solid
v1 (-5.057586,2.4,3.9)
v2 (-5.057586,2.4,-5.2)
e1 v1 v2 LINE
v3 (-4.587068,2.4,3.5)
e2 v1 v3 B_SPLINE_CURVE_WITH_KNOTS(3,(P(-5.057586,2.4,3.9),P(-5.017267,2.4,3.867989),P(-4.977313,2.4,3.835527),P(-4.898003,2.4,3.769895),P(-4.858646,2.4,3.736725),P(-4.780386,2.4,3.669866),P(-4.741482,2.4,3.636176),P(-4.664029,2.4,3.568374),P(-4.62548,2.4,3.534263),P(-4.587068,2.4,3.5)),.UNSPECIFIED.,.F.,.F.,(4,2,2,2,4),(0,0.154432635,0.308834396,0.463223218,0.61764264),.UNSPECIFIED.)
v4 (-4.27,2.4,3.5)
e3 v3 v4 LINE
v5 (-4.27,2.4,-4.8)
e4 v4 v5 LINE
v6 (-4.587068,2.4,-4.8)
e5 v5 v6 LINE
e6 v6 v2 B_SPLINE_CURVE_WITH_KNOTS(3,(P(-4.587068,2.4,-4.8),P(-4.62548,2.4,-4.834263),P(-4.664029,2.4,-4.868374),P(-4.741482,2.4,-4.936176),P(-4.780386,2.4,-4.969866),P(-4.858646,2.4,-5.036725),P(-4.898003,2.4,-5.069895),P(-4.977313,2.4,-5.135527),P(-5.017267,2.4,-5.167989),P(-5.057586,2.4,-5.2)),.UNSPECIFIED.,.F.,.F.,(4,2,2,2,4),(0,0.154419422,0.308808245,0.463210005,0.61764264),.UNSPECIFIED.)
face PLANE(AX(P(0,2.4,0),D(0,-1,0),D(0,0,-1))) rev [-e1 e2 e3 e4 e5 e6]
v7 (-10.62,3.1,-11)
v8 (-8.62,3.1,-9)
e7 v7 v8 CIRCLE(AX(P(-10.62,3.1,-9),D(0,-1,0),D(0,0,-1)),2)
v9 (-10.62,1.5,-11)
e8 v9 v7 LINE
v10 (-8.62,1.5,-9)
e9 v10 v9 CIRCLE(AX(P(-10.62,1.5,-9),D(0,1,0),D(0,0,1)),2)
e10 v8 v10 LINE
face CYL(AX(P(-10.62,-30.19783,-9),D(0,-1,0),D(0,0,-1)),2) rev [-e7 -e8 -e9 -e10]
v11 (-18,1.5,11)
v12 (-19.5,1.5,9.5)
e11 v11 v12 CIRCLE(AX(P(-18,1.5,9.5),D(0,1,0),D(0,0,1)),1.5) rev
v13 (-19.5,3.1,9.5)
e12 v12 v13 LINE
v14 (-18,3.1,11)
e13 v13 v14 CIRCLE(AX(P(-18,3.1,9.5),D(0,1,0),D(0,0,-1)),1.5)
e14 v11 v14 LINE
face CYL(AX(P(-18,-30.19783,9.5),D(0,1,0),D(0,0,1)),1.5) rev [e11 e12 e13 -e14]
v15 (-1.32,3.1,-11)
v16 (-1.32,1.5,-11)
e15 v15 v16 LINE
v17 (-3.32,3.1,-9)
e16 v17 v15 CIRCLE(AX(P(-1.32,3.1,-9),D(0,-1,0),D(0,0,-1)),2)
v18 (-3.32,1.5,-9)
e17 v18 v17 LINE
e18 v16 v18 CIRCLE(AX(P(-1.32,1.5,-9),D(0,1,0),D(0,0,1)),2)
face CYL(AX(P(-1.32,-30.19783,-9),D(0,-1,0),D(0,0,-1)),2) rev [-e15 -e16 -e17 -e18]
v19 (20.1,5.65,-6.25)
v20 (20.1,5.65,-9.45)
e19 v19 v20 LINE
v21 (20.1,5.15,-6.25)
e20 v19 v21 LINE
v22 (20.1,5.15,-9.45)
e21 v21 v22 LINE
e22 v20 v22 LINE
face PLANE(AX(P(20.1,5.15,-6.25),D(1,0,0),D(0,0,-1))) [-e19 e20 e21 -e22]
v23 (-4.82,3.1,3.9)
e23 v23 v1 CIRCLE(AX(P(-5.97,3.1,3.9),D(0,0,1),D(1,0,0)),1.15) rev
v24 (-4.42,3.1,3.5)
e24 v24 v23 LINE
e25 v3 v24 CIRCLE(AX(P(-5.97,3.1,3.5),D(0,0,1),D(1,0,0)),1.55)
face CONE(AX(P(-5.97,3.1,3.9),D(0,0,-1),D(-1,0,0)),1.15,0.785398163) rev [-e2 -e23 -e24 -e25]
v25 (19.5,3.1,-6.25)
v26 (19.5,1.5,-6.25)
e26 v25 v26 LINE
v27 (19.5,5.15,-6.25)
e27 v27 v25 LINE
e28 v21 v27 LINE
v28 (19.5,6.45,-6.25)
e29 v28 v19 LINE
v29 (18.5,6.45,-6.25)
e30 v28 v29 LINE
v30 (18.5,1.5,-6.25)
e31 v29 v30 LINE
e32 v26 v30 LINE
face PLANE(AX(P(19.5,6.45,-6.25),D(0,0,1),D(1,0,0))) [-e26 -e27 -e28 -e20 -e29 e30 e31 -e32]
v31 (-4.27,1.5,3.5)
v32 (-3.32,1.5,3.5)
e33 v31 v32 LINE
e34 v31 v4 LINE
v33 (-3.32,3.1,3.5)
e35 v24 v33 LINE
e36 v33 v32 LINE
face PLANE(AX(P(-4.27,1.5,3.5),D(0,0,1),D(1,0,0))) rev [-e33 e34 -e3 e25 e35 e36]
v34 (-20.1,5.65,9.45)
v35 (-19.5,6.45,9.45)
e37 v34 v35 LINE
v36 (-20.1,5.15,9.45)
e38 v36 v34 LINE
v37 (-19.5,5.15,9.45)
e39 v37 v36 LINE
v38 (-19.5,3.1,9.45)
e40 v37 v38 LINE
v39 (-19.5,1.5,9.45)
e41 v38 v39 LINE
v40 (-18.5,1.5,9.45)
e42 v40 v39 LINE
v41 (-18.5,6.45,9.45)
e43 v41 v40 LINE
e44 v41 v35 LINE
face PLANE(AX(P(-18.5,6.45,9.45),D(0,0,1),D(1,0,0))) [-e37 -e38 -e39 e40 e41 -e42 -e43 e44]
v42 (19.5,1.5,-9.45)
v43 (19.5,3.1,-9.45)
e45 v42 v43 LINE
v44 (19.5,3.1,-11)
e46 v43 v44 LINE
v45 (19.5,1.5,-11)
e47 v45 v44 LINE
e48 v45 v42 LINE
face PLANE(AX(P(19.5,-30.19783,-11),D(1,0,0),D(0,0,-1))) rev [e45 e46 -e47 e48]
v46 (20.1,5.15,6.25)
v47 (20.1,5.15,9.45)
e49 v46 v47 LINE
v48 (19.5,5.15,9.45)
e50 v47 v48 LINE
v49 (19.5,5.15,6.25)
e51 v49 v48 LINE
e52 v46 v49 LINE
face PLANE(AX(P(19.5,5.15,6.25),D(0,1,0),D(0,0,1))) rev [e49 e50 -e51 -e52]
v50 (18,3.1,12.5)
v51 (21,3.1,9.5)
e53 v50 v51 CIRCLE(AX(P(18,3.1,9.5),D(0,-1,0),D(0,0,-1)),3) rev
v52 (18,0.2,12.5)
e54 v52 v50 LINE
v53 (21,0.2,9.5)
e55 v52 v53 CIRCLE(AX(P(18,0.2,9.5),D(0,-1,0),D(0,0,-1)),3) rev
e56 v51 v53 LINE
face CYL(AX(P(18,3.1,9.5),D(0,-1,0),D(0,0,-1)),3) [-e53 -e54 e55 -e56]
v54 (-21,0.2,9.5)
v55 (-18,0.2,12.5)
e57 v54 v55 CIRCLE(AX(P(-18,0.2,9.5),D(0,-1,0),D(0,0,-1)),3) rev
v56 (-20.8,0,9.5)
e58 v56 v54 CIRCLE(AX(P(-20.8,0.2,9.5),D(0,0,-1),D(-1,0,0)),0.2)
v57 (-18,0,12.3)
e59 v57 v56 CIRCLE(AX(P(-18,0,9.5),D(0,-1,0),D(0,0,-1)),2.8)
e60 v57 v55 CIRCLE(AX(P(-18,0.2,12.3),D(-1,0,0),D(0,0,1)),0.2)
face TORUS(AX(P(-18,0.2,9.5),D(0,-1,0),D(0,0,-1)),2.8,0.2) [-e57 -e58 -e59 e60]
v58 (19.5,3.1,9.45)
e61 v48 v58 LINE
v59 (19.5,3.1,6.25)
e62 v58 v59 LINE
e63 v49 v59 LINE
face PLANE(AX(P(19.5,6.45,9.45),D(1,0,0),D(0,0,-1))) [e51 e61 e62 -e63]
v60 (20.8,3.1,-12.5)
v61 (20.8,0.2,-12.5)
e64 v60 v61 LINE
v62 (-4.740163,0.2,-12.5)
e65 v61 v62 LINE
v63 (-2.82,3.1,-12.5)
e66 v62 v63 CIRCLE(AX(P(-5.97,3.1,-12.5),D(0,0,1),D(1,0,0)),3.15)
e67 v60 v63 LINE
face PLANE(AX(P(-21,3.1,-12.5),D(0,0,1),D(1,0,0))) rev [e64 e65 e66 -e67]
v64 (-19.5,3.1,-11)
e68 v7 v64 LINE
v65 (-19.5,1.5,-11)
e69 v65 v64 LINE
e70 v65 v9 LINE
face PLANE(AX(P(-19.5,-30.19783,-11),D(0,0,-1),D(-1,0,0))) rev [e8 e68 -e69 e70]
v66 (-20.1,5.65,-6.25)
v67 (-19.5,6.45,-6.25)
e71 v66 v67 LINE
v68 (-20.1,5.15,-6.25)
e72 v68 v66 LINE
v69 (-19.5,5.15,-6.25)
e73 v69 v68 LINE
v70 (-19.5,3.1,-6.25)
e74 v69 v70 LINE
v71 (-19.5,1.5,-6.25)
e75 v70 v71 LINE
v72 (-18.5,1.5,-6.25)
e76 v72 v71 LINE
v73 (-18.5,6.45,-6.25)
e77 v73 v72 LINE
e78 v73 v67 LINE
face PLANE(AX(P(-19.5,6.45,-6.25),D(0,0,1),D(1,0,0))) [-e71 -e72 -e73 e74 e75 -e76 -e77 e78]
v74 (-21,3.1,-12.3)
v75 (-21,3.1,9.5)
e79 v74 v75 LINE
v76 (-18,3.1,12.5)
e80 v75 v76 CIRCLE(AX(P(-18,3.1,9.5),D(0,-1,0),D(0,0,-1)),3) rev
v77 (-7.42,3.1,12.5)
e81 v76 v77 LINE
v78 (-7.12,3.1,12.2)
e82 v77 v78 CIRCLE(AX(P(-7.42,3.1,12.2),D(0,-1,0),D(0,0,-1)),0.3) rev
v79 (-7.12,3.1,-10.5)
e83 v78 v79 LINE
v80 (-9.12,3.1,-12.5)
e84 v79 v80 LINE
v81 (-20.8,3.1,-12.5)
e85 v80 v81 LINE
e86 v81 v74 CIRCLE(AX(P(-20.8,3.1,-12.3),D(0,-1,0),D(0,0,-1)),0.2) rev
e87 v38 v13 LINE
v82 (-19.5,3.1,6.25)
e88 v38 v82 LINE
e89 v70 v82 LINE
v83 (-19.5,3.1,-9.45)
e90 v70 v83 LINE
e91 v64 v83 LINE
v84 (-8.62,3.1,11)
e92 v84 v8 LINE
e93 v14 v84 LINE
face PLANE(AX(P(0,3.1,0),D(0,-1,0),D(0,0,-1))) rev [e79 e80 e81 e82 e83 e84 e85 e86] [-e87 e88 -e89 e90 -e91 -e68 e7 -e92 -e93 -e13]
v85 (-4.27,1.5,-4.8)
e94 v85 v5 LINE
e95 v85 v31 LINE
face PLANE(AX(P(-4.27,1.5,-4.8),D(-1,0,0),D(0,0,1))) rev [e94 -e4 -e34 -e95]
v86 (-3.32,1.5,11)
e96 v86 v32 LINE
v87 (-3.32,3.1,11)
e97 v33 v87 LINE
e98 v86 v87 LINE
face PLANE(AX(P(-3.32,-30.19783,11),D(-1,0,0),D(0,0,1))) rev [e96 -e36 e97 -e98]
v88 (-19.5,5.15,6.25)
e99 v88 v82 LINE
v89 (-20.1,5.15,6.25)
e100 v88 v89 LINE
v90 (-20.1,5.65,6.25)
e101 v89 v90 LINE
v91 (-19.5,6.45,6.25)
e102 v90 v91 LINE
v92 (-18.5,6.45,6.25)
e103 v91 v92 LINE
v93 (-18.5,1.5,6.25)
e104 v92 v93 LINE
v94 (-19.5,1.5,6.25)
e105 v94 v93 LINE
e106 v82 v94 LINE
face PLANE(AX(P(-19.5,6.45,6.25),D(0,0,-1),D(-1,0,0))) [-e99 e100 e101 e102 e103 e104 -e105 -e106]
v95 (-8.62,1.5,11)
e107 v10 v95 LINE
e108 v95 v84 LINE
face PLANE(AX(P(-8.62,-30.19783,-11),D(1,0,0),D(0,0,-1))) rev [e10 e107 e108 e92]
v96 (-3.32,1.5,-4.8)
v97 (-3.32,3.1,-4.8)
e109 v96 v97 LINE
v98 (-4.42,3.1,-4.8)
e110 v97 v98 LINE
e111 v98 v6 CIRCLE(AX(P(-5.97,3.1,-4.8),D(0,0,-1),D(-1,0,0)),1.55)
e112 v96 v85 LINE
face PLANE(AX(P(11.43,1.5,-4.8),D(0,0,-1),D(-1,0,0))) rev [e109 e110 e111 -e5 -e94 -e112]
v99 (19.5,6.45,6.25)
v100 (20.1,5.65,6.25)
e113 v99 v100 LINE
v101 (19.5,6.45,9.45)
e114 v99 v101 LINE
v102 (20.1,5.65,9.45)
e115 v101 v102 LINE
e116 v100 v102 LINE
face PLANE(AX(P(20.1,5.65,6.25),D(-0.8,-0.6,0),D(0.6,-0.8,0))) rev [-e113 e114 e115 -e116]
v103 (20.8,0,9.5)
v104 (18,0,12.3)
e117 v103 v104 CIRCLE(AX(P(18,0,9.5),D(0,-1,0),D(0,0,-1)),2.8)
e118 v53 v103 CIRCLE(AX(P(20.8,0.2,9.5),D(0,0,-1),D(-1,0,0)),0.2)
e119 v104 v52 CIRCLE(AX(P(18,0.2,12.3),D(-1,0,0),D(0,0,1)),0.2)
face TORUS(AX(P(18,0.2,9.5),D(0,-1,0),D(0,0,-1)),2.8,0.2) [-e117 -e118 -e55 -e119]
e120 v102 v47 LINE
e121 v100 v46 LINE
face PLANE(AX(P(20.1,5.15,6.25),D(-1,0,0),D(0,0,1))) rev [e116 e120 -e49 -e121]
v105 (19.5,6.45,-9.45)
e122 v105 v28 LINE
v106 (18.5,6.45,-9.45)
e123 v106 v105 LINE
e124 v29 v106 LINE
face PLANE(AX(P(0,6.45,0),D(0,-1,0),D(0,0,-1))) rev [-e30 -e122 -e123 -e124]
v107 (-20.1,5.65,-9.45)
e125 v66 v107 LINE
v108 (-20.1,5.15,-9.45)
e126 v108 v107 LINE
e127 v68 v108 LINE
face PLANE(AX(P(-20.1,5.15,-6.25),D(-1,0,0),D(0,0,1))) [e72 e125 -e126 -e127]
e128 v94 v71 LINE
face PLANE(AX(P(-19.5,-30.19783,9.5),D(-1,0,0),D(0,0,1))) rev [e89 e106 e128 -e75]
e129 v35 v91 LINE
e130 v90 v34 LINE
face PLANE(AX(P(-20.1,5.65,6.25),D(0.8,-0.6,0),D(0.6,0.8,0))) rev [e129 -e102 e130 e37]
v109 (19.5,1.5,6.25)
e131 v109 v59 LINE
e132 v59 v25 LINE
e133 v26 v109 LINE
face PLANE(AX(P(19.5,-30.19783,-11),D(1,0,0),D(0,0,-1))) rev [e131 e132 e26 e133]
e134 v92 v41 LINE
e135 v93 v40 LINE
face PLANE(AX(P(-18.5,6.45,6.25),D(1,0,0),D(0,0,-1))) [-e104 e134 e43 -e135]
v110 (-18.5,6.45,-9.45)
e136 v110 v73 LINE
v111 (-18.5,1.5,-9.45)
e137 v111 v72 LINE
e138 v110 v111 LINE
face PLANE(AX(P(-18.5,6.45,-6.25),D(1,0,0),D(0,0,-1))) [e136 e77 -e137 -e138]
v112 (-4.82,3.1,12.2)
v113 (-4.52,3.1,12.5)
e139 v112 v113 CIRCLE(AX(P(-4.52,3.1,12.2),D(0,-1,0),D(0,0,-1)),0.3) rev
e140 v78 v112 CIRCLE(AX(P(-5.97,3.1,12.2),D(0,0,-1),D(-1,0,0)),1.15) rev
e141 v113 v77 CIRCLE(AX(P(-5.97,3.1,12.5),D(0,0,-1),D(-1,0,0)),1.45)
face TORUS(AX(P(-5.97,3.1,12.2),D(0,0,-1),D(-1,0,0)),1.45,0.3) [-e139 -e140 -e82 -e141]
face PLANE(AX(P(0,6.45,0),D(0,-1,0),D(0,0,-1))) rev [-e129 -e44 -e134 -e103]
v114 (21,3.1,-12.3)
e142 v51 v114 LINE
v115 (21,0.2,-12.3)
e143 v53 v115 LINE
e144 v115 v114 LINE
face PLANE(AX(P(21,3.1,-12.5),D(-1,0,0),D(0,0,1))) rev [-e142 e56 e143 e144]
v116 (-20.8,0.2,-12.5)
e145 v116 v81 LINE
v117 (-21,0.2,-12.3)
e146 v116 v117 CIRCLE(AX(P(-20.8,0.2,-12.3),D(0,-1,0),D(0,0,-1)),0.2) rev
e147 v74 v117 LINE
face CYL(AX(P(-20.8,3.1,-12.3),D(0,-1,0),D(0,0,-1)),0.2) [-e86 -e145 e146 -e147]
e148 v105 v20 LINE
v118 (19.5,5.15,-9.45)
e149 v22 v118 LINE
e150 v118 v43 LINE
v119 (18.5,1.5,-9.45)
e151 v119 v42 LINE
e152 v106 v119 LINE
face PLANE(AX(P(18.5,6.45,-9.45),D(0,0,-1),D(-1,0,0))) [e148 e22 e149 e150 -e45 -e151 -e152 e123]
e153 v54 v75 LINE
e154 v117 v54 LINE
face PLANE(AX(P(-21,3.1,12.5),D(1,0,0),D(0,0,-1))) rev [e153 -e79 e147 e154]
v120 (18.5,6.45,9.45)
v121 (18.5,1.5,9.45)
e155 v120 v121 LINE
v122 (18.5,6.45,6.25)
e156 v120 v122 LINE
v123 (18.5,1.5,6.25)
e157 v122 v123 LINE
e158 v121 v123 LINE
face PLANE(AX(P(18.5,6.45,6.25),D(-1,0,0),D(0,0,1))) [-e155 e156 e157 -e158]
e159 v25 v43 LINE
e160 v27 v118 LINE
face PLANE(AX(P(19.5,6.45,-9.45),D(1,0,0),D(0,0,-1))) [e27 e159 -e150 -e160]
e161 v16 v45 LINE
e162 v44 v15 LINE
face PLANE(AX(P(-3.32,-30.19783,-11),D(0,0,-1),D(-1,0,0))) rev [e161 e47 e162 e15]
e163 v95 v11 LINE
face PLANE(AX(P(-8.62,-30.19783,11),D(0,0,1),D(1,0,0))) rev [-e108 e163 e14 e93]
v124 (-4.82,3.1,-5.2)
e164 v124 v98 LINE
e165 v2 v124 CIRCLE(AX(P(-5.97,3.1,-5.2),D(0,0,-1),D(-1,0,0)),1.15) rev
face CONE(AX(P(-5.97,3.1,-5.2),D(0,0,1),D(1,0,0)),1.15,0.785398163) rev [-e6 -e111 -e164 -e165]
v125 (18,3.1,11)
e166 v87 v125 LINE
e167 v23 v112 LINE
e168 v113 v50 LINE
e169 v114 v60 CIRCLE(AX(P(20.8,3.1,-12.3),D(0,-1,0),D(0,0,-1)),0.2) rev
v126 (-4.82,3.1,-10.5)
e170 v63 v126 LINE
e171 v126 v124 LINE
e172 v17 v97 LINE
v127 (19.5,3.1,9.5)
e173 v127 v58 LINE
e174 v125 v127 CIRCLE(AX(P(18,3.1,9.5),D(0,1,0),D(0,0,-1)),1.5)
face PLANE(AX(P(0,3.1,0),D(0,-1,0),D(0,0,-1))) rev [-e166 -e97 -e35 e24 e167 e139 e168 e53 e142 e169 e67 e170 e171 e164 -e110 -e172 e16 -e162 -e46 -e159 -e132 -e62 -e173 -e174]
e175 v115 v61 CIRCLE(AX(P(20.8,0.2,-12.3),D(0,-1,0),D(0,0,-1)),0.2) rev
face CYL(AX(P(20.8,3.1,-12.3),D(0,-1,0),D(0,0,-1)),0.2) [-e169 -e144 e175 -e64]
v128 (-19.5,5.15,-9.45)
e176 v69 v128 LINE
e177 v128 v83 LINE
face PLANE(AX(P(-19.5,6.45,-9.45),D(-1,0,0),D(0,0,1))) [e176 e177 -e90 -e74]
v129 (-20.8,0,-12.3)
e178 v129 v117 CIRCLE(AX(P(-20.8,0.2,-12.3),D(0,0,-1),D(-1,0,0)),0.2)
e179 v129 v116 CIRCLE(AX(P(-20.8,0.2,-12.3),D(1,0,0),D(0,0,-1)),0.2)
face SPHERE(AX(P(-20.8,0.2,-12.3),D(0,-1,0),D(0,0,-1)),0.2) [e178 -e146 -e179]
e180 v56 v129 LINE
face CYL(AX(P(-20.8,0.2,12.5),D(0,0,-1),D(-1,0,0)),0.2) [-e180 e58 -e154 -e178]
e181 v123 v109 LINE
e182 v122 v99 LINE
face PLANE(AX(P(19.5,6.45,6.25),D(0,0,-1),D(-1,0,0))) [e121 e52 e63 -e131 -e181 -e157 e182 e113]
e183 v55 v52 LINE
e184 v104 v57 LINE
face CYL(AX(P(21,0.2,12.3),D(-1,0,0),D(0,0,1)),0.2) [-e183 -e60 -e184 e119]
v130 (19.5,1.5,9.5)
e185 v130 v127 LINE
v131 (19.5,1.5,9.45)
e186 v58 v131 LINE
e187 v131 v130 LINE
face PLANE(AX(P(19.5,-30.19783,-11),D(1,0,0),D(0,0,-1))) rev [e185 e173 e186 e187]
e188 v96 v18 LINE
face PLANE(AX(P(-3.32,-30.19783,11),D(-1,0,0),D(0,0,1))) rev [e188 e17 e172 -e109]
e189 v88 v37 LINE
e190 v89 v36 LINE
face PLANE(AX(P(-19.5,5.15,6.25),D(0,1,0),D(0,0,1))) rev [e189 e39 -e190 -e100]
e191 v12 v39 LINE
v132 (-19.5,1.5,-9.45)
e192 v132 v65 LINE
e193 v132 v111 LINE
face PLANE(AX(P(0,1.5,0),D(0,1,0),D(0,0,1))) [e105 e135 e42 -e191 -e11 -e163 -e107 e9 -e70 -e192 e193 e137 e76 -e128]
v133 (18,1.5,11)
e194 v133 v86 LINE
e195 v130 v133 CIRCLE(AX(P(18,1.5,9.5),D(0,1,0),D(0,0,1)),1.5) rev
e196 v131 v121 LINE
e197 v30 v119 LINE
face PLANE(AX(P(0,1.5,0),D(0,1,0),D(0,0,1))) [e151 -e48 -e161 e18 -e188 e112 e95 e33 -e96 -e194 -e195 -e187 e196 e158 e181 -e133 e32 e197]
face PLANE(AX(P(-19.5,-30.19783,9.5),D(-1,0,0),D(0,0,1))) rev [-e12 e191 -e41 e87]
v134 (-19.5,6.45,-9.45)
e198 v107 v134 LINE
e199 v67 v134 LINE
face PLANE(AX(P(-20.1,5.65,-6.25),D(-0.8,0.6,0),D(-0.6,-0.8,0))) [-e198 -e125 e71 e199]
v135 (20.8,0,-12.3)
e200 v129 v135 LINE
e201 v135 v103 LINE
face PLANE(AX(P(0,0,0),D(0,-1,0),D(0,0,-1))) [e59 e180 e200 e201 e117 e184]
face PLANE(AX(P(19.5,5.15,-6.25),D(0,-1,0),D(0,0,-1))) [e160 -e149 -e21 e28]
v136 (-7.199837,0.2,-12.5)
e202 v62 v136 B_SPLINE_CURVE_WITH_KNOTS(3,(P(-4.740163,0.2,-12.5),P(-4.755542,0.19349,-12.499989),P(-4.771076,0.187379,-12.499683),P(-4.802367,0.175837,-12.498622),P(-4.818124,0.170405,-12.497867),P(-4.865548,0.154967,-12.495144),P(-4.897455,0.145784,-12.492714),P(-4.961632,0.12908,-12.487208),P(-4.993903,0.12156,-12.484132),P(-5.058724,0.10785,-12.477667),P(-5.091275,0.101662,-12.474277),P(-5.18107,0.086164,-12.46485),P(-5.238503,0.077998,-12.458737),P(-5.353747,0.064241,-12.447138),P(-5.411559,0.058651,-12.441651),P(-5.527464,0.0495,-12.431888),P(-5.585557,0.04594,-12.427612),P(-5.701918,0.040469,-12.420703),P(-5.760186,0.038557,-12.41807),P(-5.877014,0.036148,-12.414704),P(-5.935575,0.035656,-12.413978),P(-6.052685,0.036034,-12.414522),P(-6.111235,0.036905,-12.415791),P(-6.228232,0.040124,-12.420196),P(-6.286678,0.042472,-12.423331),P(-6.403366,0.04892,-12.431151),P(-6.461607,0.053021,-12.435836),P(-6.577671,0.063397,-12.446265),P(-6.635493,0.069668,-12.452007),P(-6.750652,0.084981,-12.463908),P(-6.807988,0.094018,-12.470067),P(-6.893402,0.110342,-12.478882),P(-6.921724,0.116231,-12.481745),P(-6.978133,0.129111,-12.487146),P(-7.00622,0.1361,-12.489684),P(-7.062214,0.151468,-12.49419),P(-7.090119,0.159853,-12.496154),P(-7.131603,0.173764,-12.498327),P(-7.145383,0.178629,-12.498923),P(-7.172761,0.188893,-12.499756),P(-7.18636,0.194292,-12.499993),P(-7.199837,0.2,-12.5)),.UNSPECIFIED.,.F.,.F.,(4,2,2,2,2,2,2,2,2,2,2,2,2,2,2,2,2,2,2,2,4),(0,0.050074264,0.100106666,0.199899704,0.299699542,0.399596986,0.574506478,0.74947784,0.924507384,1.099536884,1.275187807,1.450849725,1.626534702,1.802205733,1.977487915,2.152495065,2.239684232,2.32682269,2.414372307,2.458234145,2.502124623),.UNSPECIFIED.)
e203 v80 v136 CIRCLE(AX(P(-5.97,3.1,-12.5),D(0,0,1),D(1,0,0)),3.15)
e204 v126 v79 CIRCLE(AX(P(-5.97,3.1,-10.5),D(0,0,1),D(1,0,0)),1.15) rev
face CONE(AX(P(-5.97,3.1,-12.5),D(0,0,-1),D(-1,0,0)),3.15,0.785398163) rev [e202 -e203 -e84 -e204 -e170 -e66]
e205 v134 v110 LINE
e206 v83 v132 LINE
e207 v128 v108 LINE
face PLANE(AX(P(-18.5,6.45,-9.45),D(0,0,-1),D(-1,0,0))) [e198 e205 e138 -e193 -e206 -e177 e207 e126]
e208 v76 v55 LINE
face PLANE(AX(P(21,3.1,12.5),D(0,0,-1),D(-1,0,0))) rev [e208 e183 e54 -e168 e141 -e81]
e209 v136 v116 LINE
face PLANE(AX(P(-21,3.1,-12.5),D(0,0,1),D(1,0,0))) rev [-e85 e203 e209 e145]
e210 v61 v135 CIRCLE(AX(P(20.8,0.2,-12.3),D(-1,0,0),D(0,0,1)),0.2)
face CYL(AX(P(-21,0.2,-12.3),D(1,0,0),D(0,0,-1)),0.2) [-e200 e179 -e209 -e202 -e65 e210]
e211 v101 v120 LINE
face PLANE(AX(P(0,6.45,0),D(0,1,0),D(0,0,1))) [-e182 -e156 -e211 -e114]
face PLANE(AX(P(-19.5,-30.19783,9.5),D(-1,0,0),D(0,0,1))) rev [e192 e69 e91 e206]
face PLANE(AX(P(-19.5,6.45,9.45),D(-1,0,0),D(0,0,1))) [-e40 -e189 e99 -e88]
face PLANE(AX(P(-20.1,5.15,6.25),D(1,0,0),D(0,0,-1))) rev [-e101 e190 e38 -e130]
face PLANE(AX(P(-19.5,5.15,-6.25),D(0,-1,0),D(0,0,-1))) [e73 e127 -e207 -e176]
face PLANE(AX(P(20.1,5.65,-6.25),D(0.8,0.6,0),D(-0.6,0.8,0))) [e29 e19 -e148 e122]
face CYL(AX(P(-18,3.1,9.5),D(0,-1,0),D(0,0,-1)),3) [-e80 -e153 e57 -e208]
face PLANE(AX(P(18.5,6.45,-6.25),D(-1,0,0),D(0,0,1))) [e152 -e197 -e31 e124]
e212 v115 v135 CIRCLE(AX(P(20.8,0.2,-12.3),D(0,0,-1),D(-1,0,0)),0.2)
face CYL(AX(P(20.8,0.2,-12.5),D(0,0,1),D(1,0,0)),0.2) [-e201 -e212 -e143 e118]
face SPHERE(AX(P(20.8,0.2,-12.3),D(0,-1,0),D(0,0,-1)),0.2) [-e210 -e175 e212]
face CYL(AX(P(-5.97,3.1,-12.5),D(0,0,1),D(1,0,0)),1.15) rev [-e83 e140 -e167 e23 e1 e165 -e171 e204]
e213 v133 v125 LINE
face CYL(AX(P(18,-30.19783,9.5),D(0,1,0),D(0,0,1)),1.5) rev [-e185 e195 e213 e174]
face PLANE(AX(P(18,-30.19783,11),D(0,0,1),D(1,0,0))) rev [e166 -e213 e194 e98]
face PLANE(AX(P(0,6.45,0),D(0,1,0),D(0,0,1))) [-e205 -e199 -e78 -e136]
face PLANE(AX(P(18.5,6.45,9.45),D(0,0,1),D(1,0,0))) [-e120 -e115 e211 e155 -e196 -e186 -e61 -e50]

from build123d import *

# Parameters (mm, degrees)
SKETCH_1_W          = 42
SKETCH_1_H          = 25
EXTRUDE_1_DEPTH     = 3.1
SKETCH_3_R          = 1.15
CUT_EXTRUDE_1_DEPTH = 33.796493715
SKETCH_5_W          = 15.7
SKETCH_5_H          = 8.3
CUT_EXTRUDE_3_DEPTH = 1.6
FILLET_4_R          = 3
SKETCH_10_W         = 1.324084548
SKETCH_10_H         = 8.3
CUT_EXTRUDE_4_DEPTH = 0.7
CUT_EXTRUDE_5_DEPTH = 1.6
FILLET_5_R          = 0.3
CHAMFER_1_SIZE      = 0.4
CHAMFER_2_SIZE      = 2
FILLET_6_R          = 2
SKETCH_13_W         = 1
SKETCH_13_H         = 3.2
EXTRUDE_2_DEPTH     = 4.95
EXTRUDE_3_DEPTH     = 3.2
FILLET_7_R          = 0.2
FILLET_8_R          = 0.2


with BuildPart() as part:
    # 草图1 → 凸台-拉伸1 (new body)
    with BuildSketch(Plane(origin=(0, 0, 0), x_dir=(1, 0, 0), z_dir=(0, 1, 0))):
        Rectangle(SKETCH_1_W, SKETCH_1_H)
    extrude(amount=EXTRUDE_1_DEPTH)

    # 草图3 → 切除-拉伸1 (cut, through all)
    with BuildSketch(Plane.XY.offset(12.5)):
        with Locations((-5.97, 3.1)):
            Circle(SKETCH_3_R)
    extrude(amount=-CUT_EXTRUDE_1_DEPTH, mode=Mode.SUBTRACT)

    # 草图5 → 切除-拉伸3 (cut)
    with BuildSketch(Plane(origin=(0, 3.1, 0), x_dir=(1, 0, 0), z_dir=(0, 1, 0))):
        with Locations((3.58, 0.65)):
            Rectangle(SKETCH_5_W, SKETCH_5_H)
    extrude(amount=-CUT_EXTRUDE_3_DEPTH, mode=Mode.SUBTRACT)

    # 圆角4
    fillet_4_edges = [part.edges().sort_by_distance(p)[0] for p in [
        (-21, 1.55, 12.5),
        (21, 1.55, 12.5),
    ]]
    fillet(fillet_4_edges, radius=FILLET_4_R)

    # 草图10 → 切除-拉伸4 (cut)
    with BuildSketch(Plane(origin=(0, 3.1, 0), x_dir=(1, 0, 0), z_dir=(0, 1, 0))):
        with Locations((-4.932042274, 0.65)):
            Rectangle(SKETCH_10_W, SKETCH_10_H)
    extrude(amount=-CUT_EXTRUDE_4_DEPTH, mode=Mode.SUBTRACT)

    # 草图11 → 切除-拉伸5 (cut)
    with BuildSketch(Plane(origin=(0, 3.1, 0), x_dir=(1, 0, 0), z_dir=(0, 1, 0))):
        with BuildLine():
            Line((-3.32, -11), (-3.32, 11))
            Line((-3.32, 11), (19.5, 11))
            Line((19.5, 11), (19.5, -9.5))
            ThreePointArc((19.5, -9.5), (19.060660172, -10.560660172), (18, -11))
            Line((18, -11), (-3.32, -11))
        make_face()
        with BuildLine():
            Line((-19.5, 11), (-8.62, 11))
            Line((-8.62, 11), (-8.62, -11))
            Line((-8.62, -11), (-18, -11))
            ThreePointArc((-18, -11), (-19.060660172, -10.560660172), (-19.5, -9.5))
            Line((-19.5, -9.5), (-19.5, 11))
        make_face()
    extrude(amount=-CUT_EXTRUDE_5_DEPTH, mode=Mode.SUBTRACT)

    # 圆角5
    fillet_5_edges = [part.edges().sort_by_distance(p)[0] for p in [
        (-5.97, 1.95, 12.5),
    ]]
    fillet(fillet_5_edges, radius=FILLET_5_R)

    # 倒角1
    chamfer_1_edges = [part.edges().sort_by_distance(p)[0] for p in [
        (-4.881015028, 2.730389757, 3.5),
        (-4.881015028, 2.730389757, -4.8),
    ]]
    chamfer(chamfer_1_edges, length=CHAMFER_1_SIZE)

    # 倒角2
    # the kernel refuses this chamfer: 2 mm, written as the material it takes off along each edge
    with BuildSketch(Plane(origin=(-5.97, 3.1, -12.5), x_dir=(-0.0031415874858793974, 0.9999950652018581, 0), z_dir=(0.9999950652018581, 0.0031415874858793974, 0))) as chamfer_2_piece_1:
        Polygon((1.15, CHAMFER_2_SIZE), (1.15 + CHAMFER_2_SIZE, 0), (1.15, 0), align=None)
    revolve(axis=Axis((-5.97, 3.1, -12.5), (0, 0, 1)), revolution_arc=359.64, mode=Mode.SUBTRACT)

    # 圆角6
    fillet_6_edges = [part.edges().sort_by_distance(p)[0] for p in [
        (-3.32, 2.3, -11),
        (-8.62, 2.3, -11),
    ]]
    fillet(fillet_6_edges, radius=FILLET_6_R)

    # 草图13 → 凸台-拉伸2 (add)
    with BuildSketch(Plane.XZ.offset(-1.5)):
        with Locations((19, 7.85)):
            Rectangle(SKETCH_13_W, SKETCH_13_H)
        with Locations((19, -7.85)):
            Rectangle(SKETCH_13_W, SKETCH_13_H)
        with Locations((-19, -7.85)):
            Rectangle(SKETCH_13_W, SKETCH_13_H)
        with Locations((-19, 7.85)):
            Rectangle(SKETCH_13_W, SKETCH_13_H)
    extrude(amount=-EXTRUDE_2_DEPTH)

    # 草图14 → 凸台-拉伸3 (add)
    with BuildSketch(Plane(origin=(0, 0, -9.45), x_dir=(-1, 0, 0), z_dir=(0, 0, -1))):
        Polygon((-19.5, 6.45), (-19.5, 5.15), (-20.1, 5.15), (-20.1, 5.65), align=None)
        Polygon((20.1, 5.65), (19.5, 6.45), (19.5, 5.15), (20.1, 5.15), align=None)
    extrude_3 = extrude(amount=-EXTRUDE_3_DEPTH)

    # 镜向1: 凸台-拉伸3 across plane
    add(extrude_3.mirror(Plane.XY))

    # 圆角7
    fillet_7_edges = [part.edges().sort_by_distance(p)[0] for p in [
        (-21, 1.55, -12.5),
        (21, 1.55, -12.5),
    ]]
    fillet(fillet_7_edges, radius=FILLET_7_R)

    # 圆角8
    # the kernel refuses this fillet: 0.2 mm, written as the material it takes off along each edge
    with BuildSketch(Plane(origin=(-20.8, 0, -12.3), x_dir=(0, 0, -1), z_dir=(1, 0, 0))) as fillet_8_piece_1:
        with BuildLine():
            CenterArc((0.2 - FILLET_8_R, FILLET_8_R), FILLET_8_R, 270, 90)
            Line((0.2, FILLET_8_R), (0.2 + FILLET_8_R * 0.02, FILLET_8_R))
            Line((0.2 + FILLET_8_R * 0.02, FILLET_8_R), (0.2 + FILLET_8_R * 0.02, -FILLET_8_R * 0.02))
            Line((0.2 + FILLET_8_R * 0.02, -FILLET_8_R * 0.02), (0.2 - FILLET_8_R, -FILLET_8_R * 0.02))
            Line((0.2 - FILLET_8_R, -FILLET_8_R * 0.02), (0.2 - FILLET_8_R, 0))
        make_face()
    revolve(axis=Axis((-20.8, 0, -12.3), (0, 1, 0)), revolution_arc=90, mode=Mode.SUBTRACT)
    with BuildSketch(Plane(origin=(-21, 0, 9.5), x_dir=(1, 0, 0), z_dir=(0, 0, -1))) as fillet_8_piece_2:
        with BuildLine():
            CenterArc((FILLET_8_R, -FILLET_8_R), FILLET_8_R, 90, 90)
            Line((0, -FILLET_8_R), (-FILLET_8_R * 0.02, -FILLET_8_R))
            Line((-FILLET_8_R * 0.02, -FILLET_8_R), (-FILLET_8_R * 0.02, FILLET_8_R * 0.02))
            Line((-FILLET_8_R * 0.02, FILLET_8_R * 0.02), (FILLET_8_R, FILLET_8_R * 0.02))
            Line((FILLET_8_R, FILLET_8_R * 0.02), (FILLET_8_R, 0))
        make_face()
    extrude(amount=21.8, mode=Mode.SUBTRACT)
    with BuildSketch(Plane(origin=(-18, 0, 9.5), x_dir=(-1, 0, 0), z_dir=(0, 0, -1))) as fillet_8_piece_3:
        with BuildLine():
            CenterArc((3 - FILLET_8_R, FILLET_8_R), FILLET_8_R, 270, 90)
            Line((3, FILLET_8_R), (3 + FILLET_8_R * 0.02, FILLET_8_R))
            Line((3 + FILLET_8_R * 0.02, FILLET_8_R), (3 + FILLET_8_R * 0.02, -FILLET_8_R * 0.02))
            Line((3 + FILLET_8_R * 0.02, -FILLET_8_R * 0.02), (3 - FILLET_8_R, -FILLET_8_R * 0.02))
            Line((3 - FILLET_8_R, -FILLET_8_R * 0.02), (3 - FILLET_8_R, 0))
        make_face()
    revolve(axis=Axis((-18, 0, 9.5), (0, 1, 0)), revolution_arc=90, mode=Mode.SUBTRACT)
    with BuildSketch(Plane(origin=(18, 0, 12.5), x_dir=(0, 1, 0), z_dir=(-1, 0, 0))) as fillet_8_piece_4:
        with BuildLine():
            CenterArc((FILLET_8_R, FILLET_8_R), FILLET_8_R, 180, 90)
            Line((0, FILLET_8_R), (-FILLET_8_R * 0.02, FILLET_8_R))
            Line((-FILLET_8_R * 0.02, FILLET_8_R), (-FILLET_8_R * 0.02, -FILLET_8_R * 0.02))
            Line((-FILLET_8_R * 0.02, -FILLET_8_R * 0.02), (FILLET_8_R, -FILLET_8_R * 0.02))
            Line((FILLET_8_R, -FILLET_8_R * 0.02), (FILLET_8_R, 0))
        make_face()
    extrude(amount=36, mode=Mode.SUBTRACT)
    with BuildSketch(Plane(origin=(18, 0, 9.5), x_dir=(0, 0, 1), z_dir=(-1, 0, 0))) as fillet_8_piece_5:
        with BuildLine():
            CenterArc((3 - FILLET_8_R, FILLET_8_R), FILLET_8_R, 270, 90)
            Line((3 - FILLET_8_R, 0), (3 - FILLET_8_R, -FILLET_8_R * 0.02))
            Line((3 - FILLET_8_R, -FILLET_8_R * 0.02), (3 + FILLET_8_R * 0.02, -FILLET_8_R * 0.02))
            Line((3 + FILLET_8_R * 0.02, -FILLET_8_R * 0.02), (3 + FILLET_8_R * 0.02, FILLET_8_R))
            Line((3 + FILLET_8_R * 0.02, FILLET_8_R), (3, FILLET_8_R))
        make_face()
    revolve(axis=Axis((18, 0, 9.5), (0, 1, 0)), revolution_arc=90, mode=Mode.SUBTRACT)
    with BuildSketch(Plane(origin=(21, 0, -12.3), x_dir=(0, 1, 0), z_dir=(0, 0, 1))) as fillet_8_piece_6:
        with BuildLine():
            CenterArc((FILLET_8_R, FILLET_8_R), FILLET_8_R, 180, 90)
            Line((0, FILLET_8_R), (-FILLET_8_R * 0.02, FILLET_8_R))
            Line((-FILLET_8_R * 0.02, FILLET_8_R), (-FILLET_8_R * 0.02, -FILLET_8_R * 0.02))
            Line((-FILLET_8_R * 0.02, -FILLET_8_R * 0.02), (FILLET_8_R, -FILLET_8_R * 0.02))
            Line((FILLET_8_R, -FILLET_8_R * 0.02), (FILLET_8_R, 0))
        make_face()
    extrude(amount=21.8, mode=Mode.SUBTRACT)
    with BuildSketch(Plane(origin=(20.8, 0, -12.3), x_dir=(0, 0, -1), z_dir=(-1, 0, 0))) as fillet_8_piece_7:
        with BuildLine():
            CenterArc((0.2 - FILLET_8_R, -FILLET_8_R), FILLET_8_R, 0, 90)
            Line((0.2 - FILLET_8_R, 0), (0.2 - FILLET_8_R, FILLET_8_R * 0.02))
            Line((0.2 - FILLET_8_R, FILLET_8_R * 0.02), (0.2 + FILLET_8_R * 0.02, FILLET_8_R * 0.02))
            Line((0.2 + FILLET_8_R * 0.02, FILLET_8_R * 0.02), (0.2 + FILLET_8_R * 0.02, -FILLET_8_R))
            Line((0.2 + FILLET_8_R * 0.02, -FILLET_8_R), (0.2, -FILLET_8_R))
        make_face()
    revolve(axis=Axis((20.8, 0, -12.3), (0, -1, 0)), revolution_arc=90, mode=Mode.SUBTRACT)
    with BuildSketch(Plane(origin=(-6.610983006, 0, -12.5), x_dir=(0, 1, 0), z_dir=(1, 0, 0))) as fillet_8_piece_8:
        with BuildLine():
            CenterArc((FILLET_8_R, FILLET_8_R), FILLET_8_R, 180, 90)
            Line((0, FILLET_8_R), (-FILLET_8_R * 0.02, FILLET_8_R))
            Line((-FILLET_8_R * 0.02, FILLET_8_R), (-FILLET_8_R * 0.02, -FILLET_8_R * 0.02))
            Line((-FILLET_8_R * 0.02, -FILLET_8_R * 0.02), (FILLET_8_R, -FILLET_8_R * 0.02))
            Line((FILLET_8_R, -FILLET_8_R * 0.02), (FILLET_8_R, 0))
        make_face()
    extrude(amount=27.410983006, mode=Mode.SUBTRACT)
    with BuildSketch(Plane(origin=(-20.8, 0, -12.5), x_dir=(0, 0, 1), z_dir=(1, 0, 0))) as fillet_8_piece_9:
        with BuildLine():
            CenterArc((FILLET_8_R, -FILLET_8_R), FILLET_8_R, 90, 90)
            Line((0, -FILLET_8_R), (-FILLET_8_R * 0.02, -FILLET_8_R))
            Line((-FILLET_8_R * 0.02, -FILLET_8_R), (-FILLET_8_R * 0.02, FILLET_8_R * 0.02))
            Line((-FILLET_8_R * 0.02, FILLET_8_R * 0.02), (FILLET_8_R, FILLET_8_R * 0.02))
            Line((FILLET_8_R, FILLET_8_R * 0.02), (FILLET_8_R, 0))
        make_face()
    extrude(amount=15.470983006, mode=Mode.SUBTRACT)


solid = part.part
